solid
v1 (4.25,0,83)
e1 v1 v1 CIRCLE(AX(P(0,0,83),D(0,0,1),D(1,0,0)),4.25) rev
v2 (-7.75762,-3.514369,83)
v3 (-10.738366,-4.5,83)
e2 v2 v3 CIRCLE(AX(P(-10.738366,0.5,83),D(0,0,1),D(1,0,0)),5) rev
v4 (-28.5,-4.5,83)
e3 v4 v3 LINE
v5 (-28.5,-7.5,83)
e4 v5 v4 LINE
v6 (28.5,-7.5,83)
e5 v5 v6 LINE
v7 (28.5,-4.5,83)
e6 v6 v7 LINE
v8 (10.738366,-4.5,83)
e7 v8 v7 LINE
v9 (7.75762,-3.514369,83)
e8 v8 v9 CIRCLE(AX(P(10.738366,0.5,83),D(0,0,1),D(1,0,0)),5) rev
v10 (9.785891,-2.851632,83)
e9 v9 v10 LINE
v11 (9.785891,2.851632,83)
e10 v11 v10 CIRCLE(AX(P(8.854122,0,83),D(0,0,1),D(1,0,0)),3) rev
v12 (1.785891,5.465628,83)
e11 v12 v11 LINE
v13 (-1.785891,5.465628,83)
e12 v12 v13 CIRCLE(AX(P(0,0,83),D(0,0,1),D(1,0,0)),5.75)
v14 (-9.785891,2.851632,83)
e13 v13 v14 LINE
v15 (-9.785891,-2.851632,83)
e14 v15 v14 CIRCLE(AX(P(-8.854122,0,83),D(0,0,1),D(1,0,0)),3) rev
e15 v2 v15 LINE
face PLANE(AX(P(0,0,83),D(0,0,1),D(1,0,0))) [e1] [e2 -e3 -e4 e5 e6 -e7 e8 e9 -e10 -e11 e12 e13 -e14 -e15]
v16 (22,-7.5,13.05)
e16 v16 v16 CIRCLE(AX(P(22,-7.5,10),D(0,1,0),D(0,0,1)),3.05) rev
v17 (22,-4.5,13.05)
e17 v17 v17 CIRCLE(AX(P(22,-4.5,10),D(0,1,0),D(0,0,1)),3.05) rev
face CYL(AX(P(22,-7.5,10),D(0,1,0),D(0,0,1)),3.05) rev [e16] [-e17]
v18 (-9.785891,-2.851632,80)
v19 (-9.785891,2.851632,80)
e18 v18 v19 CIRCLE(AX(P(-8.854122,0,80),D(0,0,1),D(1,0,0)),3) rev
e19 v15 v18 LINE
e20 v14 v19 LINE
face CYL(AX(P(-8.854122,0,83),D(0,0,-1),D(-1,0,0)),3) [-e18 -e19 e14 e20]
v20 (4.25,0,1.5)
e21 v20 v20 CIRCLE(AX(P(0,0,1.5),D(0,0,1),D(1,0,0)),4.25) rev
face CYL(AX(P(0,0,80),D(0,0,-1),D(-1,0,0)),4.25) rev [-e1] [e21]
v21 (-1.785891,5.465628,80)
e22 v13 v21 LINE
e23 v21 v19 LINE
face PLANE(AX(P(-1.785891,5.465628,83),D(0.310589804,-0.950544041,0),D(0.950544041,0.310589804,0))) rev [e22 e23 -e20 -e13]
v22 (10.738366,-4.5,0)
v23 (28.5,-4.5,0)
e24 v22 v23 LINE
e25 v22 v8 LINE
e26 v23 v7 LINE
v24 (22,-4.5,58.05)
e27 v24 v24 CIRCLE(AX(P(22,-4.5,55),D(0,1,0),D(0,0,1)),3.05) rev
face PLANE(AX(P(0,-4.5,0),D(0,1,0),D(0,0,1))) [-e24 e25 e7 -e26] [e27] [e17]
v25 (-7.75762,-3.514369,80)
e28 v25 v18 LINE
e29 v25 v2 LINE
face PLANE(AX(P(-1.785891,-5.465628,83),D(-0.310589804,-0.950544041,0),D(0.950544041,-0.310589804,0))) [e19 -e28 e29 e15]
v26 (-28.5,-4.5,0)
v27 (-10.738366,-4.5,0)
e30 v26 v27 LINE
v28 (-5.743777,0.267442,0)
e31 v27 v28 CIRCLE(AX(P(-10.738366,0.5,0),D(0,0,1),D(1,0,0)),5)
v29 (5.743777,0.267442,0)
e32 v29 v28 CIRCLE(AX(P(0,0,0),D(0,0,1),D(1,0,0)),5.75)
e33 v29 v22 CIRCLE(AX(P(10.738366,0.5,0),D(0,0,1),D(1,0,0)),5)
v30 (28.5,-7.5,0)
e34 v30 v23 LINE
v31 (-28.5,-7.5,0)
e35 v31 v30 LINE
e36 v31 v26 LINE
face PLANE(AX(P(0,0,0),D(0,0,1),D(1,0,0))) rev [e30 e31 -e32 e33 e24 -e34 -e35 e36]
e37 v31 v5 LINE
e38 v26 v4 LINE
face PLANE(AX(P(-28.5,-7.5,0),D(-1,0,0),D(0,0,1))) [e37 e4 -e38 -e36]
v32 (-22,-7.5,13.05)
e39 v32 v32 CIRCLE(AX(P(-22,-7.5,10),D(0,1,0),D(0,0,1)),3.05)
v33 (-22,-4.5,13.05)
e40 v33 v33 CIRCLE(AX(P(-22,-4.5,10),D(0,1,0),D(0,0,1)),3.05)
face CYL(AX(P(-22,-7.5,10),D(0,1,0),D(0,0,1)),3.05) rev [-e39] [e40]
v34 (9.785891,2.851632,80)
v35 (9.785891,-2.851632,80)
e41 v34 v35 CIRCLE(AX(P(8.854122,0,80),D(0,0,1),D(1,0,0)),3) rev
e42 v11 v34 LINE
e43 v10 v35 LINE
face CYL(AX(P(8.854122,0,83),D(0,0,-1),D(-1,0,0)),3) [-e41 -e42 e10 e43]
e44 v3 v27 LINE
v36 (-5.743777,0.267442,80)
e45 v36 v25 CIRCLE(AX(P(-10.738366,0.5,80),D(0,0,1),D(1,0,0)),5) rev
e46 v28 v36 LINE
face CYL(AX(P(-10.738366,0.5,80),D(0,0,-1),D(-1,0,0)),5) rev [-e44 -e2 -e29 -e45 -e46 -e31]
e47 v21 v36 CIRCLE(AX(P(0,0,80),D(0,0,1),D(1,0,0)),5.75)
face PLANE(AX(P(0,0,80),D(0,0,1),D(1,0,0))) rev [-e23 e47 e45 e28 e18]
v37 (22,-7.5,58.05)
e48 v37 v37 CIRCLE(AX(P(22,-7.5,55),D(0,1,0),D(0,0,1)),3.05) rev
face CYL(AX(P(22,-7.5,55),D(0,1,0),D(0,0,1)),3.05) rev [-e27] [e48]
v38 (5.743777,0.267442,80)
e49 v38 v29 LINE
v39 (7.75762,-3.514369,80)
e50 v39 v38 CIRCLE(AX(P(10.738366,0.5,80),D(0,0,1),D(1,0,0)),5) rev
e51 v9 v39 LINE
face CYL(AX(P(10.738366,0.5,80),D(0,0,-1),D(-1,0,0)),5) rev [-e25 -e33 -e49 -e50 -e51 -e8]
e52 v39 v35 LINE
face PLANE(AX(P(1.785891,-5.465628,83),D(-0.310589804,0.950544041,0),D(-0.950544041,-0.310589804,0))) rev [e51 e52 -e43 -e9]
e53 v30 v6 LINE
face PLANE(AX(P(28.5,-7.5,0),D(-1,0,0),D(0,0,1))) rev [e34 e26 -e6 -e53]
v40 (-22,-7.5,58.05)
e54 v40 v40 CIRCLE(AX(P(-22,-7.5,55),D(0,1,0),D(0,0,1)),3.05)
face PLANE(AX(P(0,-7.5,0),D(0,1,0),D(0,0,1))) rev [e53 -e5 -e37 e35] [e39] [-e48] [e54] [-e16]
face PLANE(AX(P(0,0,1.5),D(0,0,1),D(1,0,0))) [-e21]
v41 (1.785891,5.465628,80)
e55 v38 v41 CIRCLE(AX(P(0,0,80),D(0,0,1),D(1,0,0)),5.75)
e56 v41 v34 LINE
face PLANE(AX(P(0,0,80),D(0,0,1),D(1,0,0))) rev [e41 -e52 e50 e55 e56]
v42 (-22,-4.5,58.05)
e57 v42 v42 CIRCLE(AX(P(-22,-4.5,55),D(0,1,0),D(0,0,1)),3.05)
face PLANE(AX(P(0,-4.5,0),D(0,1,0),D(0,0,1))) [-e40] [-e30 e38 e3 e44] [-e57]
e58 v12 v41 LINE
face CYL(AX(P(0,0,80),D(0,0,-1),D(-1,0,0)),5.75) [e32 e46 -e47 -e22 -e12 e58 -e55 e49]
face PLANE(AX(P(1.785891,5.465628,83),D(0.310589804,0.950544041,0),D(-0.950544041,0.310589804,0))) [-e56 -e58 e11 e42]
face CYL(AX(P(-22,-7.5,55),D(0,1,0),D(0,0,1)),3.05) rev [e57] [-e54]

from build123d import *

# Parameters (mm, degrees)
ESQUISSE1_R        = 4.25
BOSS_EXTRU_1_DEPTH = 1.5
ESQUISSE1_2_R      = 5.75
ESQUISSE1_2_R_2    = 4.25
EXTRU_MINCE1_DEPTH = 80
ESQUISSE2_R        = 5.75
ESQUISSE2_R_2      = 4.25
BOSS_EXTRU_2_DEPTH = 3
ESQUISSE4_W        = 57
ESQUISSE4_H        = 83
ESQUISSE4_R        = 3.05
BOSS_EXTRU_3_DEPTH = 3
CONG_1_R           = 5


with BuildPart() as part:
    # Esquisse1 → Boss.-Extru.1 (new body)
    with BuildSketch(Plane.XY):
        Circle(ESQUISSE1_R)
    extrude(amount=BOSS_EXTRU_1_DEPTH)

    # Esquisse1<2> → Extru.-Mince1 (add)
    with BuildSketch(Plane.XY):
        Circle(ESQUISSE1_2_R)
        Circle(ESQUISSE1_2_R_2, mode=Mode.SUBTRACT)
    extrude(amount=EXTRU_MINCE1_DEPTH)

    # Esquisse2 → Boss.-Extru.2 (add)
    # profile 1 of 3: a face of its own
    with BuildSketch(Plane.XY.offset(80)):
        with BuildLine():
            Line((9.78589137, 2.851632123), (1.78589137, 5.465628236))
            ThreePointArc((1.78589137, 5.465628236), (4.654641521, 3.375916514), (5.75, 0))
            ThreePointArc((5.75, 0), (4.654641521, -3.375916514), (1.78589137, -5.465628236))
            Line((1.78589137, -5.465628236), (9.78589137, -2.851632123))
            ThreePointArc((9.78589137, -2.851632123), (11.282630579, -1.761347746), (11.85412196, 0))
            ThreePointArc((11.85412196, 0), (11.282630579, 1.761347746), (9.78589137, 2.851632123))
        make_face()
    # profile 2 of 3: a face of its own
    with BuildSketch(Plane.XY.offset(80)):
        with BuildLine():
            ThreePointArc((-1.78589137, -5.465628236), (-5.75, 0), (-1.78589137, 5.465628236))
            Line((-1.78589137, 5.465628236), (-9.78589137, 2.851632123))
            ThreePointArc((-9.78589137, 2.851632123), (-11.282630579, 1.761347746), (-11.85412196, 0))
            ThreePointArc((-11.85412196, 0), (-11.282630579, -1.761347746), (-9.78589137, -2.851632123))
            Line((-9.78589137, -2.851632123), (-1.78589137, -5.465628236))
        make_face()
    # profile 3 of 3: a face of its own
    with BuildSketch(Plane.XY.offset(80)):
        with Locations(Location((0, 0, 0), (0, 0, 108.094778376))):
            Circle(ESQUISSE2_R)
        Circle(ESQUISSE2_R_2, mode=Mode.SUBTRACT)
    extrude(amount=BOSS_EXTRU_2_DEPTH)

    # Esquisse4 → Boss.-Extru.3 (add)
    with BuildSketch(Plane(origin=(0, -4.5, 0), x_dir=(1, 0, 0), z_dir=(0, 1, 0))):
        with Locations((0, -41.5)):
            Rectangle(ESQUISSE4_W, ESQUISSE4_H)
        with Locations(Location((22, -55, 0), (0, 0, 270))):
            Circle(ESQUISSE4_R, mode=Mode.SUBTRACT)
        with Locations(Location((-22, -55, 0), (0, 0, 270))):
            Circle(ESQUISSE4_R, mode=Mode.SUBTRACT)
        with Locations(Location((-22, -10, 0), (0, 0, 270))):
            Circle(ESQUISSE4_R, mode=Mode.SUBTRACT)
        with Locations(Location((22, -10, 0), (0, 0, 270))):
            Circle(ESQUISSE4_R, mode=Mode.SUBTRACT)
    extrude(amount=-BOSS_EXTRU_3_DEPTH)

    # Congé1
    # the kernel refuses this fillet: 5 mm, written as the material it adds along each edge
    with BuildSketch(Plane(origin=(3.579455266, -4.5, 97.897276329), x_dir=(0.4133759504867887, 0.9105604447586902, 0), z_dir=(0, 0, -1))) as cong_1_piece_1_section:
        with BuildLine():
            CenterArc((7.512123669, 4.451741005), CONG_1_R, 155.582916087, 87.334118235)
            Line((2.959321445, 6.518620758), (0, 0))
            ThreePointArc((0, 0), (2.617861279, 0.630497844), (5.235722557, 0))
        make_face()
    cong_1_piece_1 = extrude(amount=97.897276329, mode=Mode.PRIVATE)
    cong_1_piece_1 = split(cong_1_piece_1, bisect_by=Plane(origin=(6.241297516, -3.427571976, 83), z_dir=(0, 0, -1)), keep=Keep.TOP, mode=Mode.PRIVATE)
    add(cong_1_piece_1)
    with BuildSketch(Plane(origin=(-3.579455266, -4.5, 97.897276329), x_dir=(-0.41337595048678866, 0.9105604447586904, 0), z_dir=(0, 0, -1))) as cong_1_piece_2_section:
        with BuildLine():
            CenterArc((7.512123669, -4.451741005), CONG_1_R, 117.082965678, 87.334118235)
            Line((2.959321445, -6.518620758), (0, 0))
            ThreePointArc((0, 0), (2.617861279, -0.630497844), (5.235722557, 0))
        make_face()
    cong_1_piece_2 = extrude(amount=97.897276329, mode=Mode.PRIVATE)
    cong_1_piece_2 = split(cong_1_piece_2, bisect_by=Plane(origin=(-6.241297516, -3.427571976, 83), z_dir=(0, 0, -1)), keep=Keep.TOP, mode=Mode.PRIVATE)
    add(cong_1_piece_2)


solid = part.part
